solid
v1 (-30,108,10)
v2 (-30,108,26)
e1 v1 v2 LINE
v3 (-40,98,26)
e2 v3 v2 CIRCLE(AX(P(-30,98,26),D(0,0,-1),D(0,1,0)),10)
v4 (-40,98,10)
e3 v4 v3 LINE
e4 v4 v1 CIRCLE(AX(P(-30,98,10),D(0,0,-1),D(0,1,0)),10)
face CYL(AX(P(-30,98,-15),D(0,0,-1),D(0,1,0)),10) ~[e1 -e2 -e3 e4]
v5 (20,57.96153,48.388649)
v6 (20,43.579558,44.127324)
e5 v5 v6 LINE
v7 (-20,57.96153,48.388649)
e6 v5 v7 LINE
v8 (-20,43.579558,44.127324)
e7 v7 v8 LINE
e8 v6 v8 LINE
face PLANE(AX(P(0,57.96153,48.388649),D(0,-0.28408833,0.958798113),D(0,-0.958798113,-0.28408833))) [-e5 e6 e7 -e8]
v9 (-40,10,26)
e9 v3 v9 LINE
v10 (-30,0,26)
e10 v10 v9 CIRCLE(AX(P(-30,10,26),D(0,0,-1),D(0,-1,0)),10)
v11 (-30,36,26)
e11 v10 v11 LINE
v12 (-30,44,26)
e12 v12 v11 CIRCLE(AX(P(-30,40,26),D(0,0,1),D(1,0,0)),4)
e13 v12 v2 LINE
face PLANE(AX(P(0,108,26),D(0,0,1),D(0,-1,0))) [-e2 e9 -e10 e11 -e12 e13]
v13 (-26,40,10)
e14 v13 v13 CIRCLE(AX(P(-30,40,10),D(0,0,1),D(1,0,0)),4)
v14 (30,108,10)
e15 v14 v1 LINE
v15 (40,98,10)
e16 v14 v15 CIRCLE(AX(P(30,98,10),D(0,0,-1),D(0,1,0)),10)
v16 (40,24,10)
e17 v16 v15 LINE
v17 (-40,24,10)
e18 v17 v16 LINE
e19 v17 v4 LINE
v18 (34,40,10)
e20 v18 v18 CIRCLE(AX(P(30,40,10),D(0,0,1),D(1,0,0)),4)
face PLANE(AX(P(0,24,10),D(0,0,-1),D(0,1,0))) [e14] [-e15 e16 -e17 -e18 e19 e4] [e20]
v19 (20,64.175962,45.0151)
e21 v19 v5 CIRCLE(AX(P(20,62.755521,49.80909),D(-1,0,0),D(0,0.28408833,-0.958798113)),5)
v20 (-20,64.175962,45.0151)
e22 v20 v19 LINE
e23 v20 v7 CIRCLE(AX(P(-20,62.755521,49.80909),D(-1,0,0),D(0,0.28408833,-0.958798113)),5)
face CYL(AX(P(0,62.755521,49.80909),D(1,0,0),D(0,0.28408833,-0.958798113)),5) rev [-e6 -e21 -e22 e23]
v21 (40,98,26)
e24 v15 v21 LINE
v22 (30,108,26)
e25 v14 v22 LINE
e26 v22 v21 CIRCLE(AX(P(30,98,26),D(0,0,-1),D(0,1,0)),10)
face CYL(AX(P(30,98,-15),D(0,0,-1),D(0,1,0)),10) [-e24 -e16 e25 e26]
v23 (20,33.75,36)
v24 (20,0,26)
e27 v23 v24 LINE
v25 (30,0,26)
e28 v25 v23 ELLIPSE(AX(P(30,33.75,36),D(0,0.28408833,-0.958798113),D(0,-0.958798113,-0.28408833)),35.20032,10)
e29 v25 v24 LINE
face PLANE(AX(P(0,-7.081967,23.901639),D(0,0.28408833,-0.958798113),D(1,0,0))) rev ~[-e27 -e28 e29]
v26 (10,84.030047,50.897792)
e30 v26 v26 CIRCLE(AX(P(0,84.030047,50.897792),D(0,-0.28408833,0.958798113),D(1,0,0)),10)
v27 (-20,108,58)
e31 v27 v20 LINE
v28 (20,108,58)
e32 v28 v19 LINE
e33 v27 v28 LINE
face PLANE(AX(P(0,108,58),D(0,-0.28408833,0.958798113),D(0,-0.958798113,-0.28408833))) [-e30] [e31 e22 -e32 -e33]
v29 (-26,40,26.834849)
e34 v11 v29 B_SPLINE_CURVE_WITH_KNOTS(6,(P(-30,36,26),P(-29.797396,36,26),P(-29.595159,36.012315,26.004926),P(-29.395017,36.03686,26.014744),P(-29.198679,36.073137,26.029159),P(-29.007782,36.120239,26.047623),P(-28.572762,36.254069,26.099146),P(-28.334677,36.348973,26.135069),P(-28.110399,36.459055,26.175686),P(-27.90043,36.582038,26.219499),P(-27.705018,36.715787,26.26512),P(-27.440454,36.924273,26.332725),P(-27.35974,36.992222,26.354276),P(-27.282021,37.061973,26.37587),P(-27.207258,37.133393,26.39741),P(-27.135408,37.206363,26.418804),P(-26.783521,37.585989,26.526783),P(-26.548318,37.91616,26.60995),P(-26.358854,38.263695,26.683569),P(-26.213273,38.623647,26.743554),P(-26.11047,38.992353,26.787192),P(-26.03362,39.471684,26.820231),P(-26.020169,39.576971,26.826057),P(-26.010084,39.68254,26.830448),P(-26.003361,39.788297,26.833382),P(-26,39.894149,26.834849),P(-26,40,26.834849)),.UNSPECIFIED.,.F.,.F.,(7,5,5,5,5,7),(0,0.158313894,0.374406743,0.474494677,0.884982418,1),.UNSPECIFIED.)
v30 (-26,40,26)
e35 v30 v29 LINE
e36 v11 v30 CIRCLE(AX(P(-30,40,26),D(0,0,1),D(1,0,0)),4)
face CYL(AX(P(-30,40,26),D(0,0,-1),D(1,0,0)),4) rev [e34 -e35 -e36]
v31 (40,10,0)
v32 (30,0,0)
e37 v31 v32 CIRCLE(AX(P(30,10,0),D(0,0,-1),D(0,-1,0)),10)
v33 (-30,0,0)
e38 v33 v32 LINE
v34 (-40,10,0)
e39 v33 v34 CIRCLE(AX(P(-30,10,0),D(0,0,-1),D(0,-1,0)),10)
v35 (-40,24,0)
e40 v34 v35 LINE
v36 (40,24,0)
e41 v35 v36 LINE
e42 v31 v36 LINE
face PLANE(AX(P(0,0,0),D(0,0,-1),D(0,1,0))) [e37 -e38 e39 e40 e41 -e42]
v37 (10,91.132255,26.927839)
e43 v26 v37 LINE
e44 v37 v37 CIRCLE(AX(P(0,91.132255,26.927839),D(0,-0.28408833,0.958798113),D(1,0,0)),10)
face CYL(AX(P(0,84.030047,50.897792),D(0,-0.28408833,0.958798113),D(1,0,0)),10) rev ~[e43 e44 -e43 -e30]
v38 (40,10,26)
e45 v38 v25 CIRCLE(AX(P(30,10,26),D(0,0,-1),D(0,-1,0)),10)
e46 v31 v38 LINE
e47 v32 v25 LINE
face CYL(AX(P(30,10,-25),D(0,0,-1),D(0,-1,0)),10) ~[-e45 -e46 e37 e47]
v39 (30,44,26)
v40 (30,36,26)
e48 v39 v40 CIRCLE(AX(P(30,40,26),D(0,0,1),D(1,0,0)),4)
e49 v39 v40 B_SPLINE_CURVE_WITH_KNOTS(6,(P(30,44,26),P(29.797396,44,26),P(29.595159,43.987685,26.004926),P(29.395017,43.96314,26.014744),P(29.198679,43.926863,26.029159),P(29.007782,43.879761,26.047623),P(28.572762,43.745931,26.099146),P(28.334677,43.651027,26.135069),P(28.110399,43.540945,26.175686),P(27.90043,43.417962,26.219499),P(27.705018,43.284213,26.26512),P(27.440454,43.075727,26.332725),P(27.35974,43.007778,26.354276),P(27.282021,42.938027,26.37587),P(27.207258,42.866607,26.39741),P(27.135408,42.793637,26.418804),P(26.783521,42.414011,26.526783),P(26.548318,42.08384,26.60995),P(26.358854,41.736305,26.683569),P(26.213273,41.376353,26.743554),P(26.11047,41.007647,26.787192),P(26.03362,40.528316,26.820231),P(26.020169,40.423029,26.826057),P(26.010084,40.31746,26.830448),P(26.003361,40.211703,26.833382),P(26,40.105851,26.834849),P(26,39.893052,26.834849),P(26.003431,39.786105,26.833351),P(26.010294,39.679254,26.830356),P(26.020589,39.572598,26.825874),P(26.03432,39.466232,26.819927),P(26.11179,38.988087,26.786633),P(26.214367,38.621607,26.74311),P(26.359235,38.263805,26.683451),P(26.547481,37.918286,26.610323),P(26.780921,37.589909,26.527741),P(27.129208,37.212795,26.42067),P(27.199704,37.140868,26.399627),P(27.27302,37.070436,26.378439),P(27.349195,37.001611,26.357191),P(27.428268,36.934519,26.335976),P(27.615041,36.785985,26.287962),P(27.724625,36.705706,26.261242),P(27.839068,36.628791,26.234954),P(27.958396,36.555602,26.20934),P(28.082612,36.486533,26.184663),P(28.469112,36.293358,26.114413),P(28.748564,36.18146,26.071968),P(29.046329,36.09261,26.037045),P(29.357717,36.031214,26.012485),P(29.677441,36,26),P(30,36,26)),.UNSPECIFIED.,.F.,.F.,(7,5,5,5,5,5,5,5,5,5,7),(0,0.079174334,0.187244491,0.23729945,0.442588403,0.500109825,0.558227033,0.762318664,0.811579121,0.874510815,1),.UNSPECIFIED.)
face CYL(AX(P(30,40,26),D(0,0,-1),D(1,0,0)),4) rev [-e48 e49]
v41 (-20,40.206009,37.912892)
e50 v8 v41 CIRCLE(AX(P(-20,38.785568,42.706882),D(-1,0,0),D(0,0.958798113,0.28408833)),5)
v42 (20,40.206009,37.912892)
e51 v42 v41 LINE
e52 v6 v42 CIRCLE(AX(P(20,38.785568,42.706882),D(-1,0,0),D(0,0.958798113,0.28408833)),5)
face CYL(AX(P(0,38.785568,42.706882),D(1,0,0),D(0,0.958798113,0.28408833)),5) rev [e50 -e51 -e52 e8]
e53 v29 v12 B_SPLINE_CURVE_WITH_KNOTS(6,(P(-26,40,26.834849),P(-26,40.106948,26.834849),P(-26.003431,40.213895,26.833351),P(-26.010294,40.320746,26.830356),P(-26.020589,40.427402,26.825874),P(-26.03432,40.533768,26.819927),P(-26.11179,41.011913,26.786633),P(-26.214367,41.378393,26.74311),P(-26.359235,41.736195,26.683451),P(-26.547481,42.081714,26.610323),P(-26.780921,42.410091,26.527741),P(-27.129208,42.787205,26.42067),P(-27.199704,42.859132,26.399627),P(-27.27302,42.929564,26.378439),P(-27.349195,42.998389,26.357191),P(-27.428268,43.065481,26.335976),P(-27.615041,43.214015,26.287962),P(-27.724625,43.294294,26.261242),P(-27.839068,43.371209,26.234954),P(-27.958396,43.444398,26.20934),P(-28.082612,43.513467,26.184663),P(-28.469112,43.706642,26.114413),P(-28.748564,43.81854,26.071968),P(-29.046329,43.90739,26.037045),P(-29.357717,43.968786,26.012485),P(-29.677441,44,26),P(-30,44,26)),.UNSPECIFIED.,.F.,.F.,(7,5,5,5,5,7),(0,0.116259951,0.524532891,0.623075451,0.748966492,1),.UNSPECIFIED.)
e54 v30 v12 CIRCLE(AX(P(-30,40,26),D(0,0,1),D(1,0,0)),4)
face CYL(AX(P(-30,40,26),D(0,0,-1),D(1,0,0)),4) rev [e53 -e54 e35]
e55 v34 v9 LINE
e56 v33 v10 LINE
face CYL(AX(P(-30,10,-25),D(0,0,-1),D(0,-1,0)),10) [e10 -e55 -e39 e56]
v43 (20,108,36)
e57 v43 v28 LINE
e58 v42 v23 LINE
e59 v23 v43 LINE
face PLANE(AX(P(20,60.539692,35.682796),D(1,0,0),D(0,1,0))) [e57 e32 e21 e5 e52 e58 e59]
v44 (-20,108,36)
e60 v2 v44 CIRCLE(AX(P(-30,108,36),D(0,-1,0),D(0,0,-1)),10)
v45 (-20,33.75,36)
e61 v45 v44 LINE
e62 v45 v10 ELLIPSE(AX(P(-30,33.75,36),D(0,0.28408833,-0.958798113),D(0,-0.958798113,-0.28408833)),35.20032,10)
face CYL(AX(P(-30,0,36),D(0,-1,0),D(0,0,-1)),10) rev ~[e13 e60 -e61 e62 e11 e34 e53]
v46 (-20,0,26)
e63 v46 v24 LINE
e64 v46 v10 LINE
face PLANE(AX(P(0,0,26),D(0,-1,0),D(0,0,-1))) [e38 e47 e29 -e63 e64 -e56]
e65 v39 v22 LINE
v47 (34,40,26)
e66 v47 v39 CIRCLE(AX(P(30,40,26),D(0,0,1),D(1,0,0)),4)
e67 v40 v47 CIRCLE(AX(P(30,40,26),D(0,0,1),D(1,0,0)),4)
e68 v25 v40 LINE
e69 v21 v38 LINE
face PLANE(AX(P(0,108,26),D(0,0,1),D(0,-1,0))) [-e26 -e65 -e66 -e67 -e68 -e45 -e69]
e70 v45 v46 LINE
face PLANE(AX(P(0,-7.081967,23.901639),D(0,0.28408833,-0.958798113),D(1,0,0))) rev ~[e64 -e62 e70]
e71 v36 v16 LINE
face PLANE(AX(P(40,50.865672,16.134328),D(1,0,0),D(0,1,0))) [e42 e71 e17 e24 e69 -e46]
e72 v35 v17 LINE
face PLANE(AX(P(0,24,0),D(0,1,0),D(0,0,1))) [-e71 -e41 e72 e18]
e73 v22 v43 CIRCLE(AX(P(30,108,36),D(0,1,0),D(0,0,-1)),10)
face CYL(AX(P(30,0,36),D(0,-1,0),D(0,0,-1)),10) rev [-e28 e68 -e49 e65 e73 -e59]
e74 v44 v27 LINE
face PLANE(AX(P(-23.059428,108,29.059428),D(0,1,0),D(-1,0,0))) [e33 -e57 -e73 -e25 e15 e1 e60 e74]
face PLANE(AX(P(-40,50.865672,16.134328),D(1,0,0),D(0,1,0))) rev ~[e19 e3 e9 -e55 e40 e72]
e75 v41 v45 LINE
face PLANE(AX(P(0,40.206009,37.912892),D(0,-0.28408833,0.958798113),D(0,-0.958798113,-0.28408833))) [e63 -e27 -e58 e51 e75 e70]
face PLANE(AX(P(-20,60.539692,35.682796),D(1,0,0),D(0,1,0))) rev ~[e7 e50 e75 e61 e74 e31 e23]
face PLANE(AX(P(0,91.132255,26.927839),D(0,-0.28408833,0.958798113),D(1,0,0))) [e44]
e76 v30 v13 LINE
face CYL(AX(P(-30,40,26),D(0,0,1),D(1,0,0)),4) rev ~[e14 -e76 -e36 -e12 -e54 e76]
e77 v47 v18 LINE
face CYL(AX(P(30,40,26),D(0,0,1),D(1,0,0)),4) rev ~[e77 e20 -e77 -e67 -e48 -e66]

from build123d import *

# Parameters (mm, degrees)
F1_DEPTH     = 20
F2_DEPTH     = 40
F3_T4_DEPTH  = 108
F3_T9_DEPTH  = 108
F3_T11_DEPTH = 76
F3_T13_DEPTH = 66
F4_R         = 10
F5_DEPTH     = 25
F6_R         = 4
F7_DEPTH     = 16
F8_DEPTH     = 25


# Not quite as in the source:
# - a fillet or chamfer that OpenCascade refuses, or shapes differently, is made with other operations: its cross-section is extruded or revolved along the edge and cut away or added


with BuildPart() as f1:
    # F0 (on Right) → F1 (new body, symmetric)
    with BuildSketch(Plane.YZ):
        with BuildLine():
            Line((40.2060094365, 37.9128916849), (0, 26))
            Line((0, 26), (108, 26))
            Line((108, 26), (108, 58))
            Line((108, 58), (64.1759622542, 45.0150999272))
            ThreePointArc((64.1759622542, 45.0150999272), (60.3700612912, 45.4148233324), (57.9615300422, 48.3886488422))
            Line((57.9615300422, 48.3886488422), (43.5795583515, 44.1273238969))
            ThreePointArc((43.5795583515, 44.1273238969), (43.1798349463, 40.3214229339), (40.2060094365, 37.9128916849))
        make_face()
    extrude(amount=F1_DEPTH, both=True)

    # F0 (on Right) → F2 (join, symmetric)
    with BuildSketch(Plane.YZ):
        Polygon((0, 26), (0, 0), (24, 0), (24, 10), (108, 10), (108, 26), align=None)
    extrude(amount=F2_DEPTH, both=True)

    # F3: fillet of radius 10 on 6 edges, made by hand


with BuildPart() as f3_tool2:
    # F3_s3 → F3_t4 (new body)
    with BuildSketch(Plane.XZ):
        with BuildLine():
            ThreePointArc((30, 26), (22.9289321881, 28.9289321881), (20, 36))
            Line((20, 36), (20, 26))
            Line((20, 26), (30, 26))
        make_face()
    extrude(amount=-F3_T4_DEPTH)

    split(bisect_by=Plane(origin=(0, -7.0819672131, 23.9016393443), x_dir=(1, 0, 0), z_dir=(0, 0.2840883297, -0.9587981127)), keep=Keep.TOP)


with BuildPart() as f1_1:
    add(f1.part)

    # F3_t1: union F3_tool2
    add(f3_tool2.part)


with BuildPart() as f3_tool7:
    # F3_s8 → F3_t9 (new body)
    with BuildSketch(Plane.XZ):
        with BuildLine():
            ThreePointArc((-30, 26), (-22.9289321881, 28.9289321881), (-20, 36))
            Line((-20, 36), (-20, 26))
            Line((-20, 26), (-30, 26))
        make_face()
    extrude(amount=-F3_T9_DEPTH)

    split(bisect_by=Plane(origin=(0, -7.0819672131, 23.9016393443), x_dir=(1, 0, 0), z_dir=(0, 0.2840883297, -0.9587981127)), keep=Keep.TOP)


with BuildPart() as f1_2:
    add(f1_1.part)

    # F3_t6: union F3_tool7
    add(f3_tool7.part)

    # F3_s12 → F3_t11 (cut)
    with BuildSketch(Plane.XY.offset(-25)):
        with BuildLine():
            ThreePointArc((30, 0), (37.0710678119, 2.9289321881), (40, 10))
            Line((40, 10), (40, 0))
            Line((40, 0), (30, 0))
        make_face()
        with BuildLine():
            ThreePointArc((-30, 0), (-37.0710678119, 2.9289321881), (-40, 10))
            Line((-40, 10), (-40, 0))
            Line((-40, 0), (-30, 0))
        make_face()
    extrude(amount=F3_T11_DEPTH, mode=Mode.SUBTRACT)

    # F3_s14 → F3_t13 (cut)
    with BuildSketch(Plane.XY.offset(-15)):
        with BuildLine():
            ThreePointArc((30, 108), (37.0710678119, 105.0710678119), (40, 98))
            Line((40, 98), (40, 108))
            Line((40, 108), (30, 108))
        make_face()
        with BuildLine():
            ThreePointArc((-30, 108), (-37.0710678119, 105.0710678119), (-40, 98))
            Line((-40, 98), (-40, 108))
            Line((-40, 108), (-30, 108))
        make_face()
    extrude(amount=F3_T13_DEPTH, mode=Mode.SUBTRACT)

    # F4 (on face) → F5 (cut)
    with BuildSketch(Plane(origin=(0, -7.0819672131, 23.9016393443), x_dir=(1, 0, 0), z_dir=(0, -0.2840883297, 0.9587981127))):
        with Locations((0, 95.0273192946)):
            Circle(F4_R)
    extrude(amount=-F5_DEPTH, mode=Mode.SUBTRACT)

    # F6 (on face) → F7 (cut, through all)
    with BuildSketch(Plane.XY.offset(26)):
        with Locations((30, 40)):
            Circle(F6_R)
        with Locations((-30, 40)):
            Circle(F6_R)
    extrude(amount=-F7_DEPTH, mode=Mode.SUBTRACT)

    # F6 (on face) → F8 (cut)
    with BuildSketch(Plane.XY.offset(26)):
        with Locations((30, 40)):
            Circle(F6_R)
        with Locations((-30, 40)):
            Circle(F6_R)
    extrude(amount=F8_DEPTH, mode=Mode.SUBTRACT)


solid = f1_2.part
